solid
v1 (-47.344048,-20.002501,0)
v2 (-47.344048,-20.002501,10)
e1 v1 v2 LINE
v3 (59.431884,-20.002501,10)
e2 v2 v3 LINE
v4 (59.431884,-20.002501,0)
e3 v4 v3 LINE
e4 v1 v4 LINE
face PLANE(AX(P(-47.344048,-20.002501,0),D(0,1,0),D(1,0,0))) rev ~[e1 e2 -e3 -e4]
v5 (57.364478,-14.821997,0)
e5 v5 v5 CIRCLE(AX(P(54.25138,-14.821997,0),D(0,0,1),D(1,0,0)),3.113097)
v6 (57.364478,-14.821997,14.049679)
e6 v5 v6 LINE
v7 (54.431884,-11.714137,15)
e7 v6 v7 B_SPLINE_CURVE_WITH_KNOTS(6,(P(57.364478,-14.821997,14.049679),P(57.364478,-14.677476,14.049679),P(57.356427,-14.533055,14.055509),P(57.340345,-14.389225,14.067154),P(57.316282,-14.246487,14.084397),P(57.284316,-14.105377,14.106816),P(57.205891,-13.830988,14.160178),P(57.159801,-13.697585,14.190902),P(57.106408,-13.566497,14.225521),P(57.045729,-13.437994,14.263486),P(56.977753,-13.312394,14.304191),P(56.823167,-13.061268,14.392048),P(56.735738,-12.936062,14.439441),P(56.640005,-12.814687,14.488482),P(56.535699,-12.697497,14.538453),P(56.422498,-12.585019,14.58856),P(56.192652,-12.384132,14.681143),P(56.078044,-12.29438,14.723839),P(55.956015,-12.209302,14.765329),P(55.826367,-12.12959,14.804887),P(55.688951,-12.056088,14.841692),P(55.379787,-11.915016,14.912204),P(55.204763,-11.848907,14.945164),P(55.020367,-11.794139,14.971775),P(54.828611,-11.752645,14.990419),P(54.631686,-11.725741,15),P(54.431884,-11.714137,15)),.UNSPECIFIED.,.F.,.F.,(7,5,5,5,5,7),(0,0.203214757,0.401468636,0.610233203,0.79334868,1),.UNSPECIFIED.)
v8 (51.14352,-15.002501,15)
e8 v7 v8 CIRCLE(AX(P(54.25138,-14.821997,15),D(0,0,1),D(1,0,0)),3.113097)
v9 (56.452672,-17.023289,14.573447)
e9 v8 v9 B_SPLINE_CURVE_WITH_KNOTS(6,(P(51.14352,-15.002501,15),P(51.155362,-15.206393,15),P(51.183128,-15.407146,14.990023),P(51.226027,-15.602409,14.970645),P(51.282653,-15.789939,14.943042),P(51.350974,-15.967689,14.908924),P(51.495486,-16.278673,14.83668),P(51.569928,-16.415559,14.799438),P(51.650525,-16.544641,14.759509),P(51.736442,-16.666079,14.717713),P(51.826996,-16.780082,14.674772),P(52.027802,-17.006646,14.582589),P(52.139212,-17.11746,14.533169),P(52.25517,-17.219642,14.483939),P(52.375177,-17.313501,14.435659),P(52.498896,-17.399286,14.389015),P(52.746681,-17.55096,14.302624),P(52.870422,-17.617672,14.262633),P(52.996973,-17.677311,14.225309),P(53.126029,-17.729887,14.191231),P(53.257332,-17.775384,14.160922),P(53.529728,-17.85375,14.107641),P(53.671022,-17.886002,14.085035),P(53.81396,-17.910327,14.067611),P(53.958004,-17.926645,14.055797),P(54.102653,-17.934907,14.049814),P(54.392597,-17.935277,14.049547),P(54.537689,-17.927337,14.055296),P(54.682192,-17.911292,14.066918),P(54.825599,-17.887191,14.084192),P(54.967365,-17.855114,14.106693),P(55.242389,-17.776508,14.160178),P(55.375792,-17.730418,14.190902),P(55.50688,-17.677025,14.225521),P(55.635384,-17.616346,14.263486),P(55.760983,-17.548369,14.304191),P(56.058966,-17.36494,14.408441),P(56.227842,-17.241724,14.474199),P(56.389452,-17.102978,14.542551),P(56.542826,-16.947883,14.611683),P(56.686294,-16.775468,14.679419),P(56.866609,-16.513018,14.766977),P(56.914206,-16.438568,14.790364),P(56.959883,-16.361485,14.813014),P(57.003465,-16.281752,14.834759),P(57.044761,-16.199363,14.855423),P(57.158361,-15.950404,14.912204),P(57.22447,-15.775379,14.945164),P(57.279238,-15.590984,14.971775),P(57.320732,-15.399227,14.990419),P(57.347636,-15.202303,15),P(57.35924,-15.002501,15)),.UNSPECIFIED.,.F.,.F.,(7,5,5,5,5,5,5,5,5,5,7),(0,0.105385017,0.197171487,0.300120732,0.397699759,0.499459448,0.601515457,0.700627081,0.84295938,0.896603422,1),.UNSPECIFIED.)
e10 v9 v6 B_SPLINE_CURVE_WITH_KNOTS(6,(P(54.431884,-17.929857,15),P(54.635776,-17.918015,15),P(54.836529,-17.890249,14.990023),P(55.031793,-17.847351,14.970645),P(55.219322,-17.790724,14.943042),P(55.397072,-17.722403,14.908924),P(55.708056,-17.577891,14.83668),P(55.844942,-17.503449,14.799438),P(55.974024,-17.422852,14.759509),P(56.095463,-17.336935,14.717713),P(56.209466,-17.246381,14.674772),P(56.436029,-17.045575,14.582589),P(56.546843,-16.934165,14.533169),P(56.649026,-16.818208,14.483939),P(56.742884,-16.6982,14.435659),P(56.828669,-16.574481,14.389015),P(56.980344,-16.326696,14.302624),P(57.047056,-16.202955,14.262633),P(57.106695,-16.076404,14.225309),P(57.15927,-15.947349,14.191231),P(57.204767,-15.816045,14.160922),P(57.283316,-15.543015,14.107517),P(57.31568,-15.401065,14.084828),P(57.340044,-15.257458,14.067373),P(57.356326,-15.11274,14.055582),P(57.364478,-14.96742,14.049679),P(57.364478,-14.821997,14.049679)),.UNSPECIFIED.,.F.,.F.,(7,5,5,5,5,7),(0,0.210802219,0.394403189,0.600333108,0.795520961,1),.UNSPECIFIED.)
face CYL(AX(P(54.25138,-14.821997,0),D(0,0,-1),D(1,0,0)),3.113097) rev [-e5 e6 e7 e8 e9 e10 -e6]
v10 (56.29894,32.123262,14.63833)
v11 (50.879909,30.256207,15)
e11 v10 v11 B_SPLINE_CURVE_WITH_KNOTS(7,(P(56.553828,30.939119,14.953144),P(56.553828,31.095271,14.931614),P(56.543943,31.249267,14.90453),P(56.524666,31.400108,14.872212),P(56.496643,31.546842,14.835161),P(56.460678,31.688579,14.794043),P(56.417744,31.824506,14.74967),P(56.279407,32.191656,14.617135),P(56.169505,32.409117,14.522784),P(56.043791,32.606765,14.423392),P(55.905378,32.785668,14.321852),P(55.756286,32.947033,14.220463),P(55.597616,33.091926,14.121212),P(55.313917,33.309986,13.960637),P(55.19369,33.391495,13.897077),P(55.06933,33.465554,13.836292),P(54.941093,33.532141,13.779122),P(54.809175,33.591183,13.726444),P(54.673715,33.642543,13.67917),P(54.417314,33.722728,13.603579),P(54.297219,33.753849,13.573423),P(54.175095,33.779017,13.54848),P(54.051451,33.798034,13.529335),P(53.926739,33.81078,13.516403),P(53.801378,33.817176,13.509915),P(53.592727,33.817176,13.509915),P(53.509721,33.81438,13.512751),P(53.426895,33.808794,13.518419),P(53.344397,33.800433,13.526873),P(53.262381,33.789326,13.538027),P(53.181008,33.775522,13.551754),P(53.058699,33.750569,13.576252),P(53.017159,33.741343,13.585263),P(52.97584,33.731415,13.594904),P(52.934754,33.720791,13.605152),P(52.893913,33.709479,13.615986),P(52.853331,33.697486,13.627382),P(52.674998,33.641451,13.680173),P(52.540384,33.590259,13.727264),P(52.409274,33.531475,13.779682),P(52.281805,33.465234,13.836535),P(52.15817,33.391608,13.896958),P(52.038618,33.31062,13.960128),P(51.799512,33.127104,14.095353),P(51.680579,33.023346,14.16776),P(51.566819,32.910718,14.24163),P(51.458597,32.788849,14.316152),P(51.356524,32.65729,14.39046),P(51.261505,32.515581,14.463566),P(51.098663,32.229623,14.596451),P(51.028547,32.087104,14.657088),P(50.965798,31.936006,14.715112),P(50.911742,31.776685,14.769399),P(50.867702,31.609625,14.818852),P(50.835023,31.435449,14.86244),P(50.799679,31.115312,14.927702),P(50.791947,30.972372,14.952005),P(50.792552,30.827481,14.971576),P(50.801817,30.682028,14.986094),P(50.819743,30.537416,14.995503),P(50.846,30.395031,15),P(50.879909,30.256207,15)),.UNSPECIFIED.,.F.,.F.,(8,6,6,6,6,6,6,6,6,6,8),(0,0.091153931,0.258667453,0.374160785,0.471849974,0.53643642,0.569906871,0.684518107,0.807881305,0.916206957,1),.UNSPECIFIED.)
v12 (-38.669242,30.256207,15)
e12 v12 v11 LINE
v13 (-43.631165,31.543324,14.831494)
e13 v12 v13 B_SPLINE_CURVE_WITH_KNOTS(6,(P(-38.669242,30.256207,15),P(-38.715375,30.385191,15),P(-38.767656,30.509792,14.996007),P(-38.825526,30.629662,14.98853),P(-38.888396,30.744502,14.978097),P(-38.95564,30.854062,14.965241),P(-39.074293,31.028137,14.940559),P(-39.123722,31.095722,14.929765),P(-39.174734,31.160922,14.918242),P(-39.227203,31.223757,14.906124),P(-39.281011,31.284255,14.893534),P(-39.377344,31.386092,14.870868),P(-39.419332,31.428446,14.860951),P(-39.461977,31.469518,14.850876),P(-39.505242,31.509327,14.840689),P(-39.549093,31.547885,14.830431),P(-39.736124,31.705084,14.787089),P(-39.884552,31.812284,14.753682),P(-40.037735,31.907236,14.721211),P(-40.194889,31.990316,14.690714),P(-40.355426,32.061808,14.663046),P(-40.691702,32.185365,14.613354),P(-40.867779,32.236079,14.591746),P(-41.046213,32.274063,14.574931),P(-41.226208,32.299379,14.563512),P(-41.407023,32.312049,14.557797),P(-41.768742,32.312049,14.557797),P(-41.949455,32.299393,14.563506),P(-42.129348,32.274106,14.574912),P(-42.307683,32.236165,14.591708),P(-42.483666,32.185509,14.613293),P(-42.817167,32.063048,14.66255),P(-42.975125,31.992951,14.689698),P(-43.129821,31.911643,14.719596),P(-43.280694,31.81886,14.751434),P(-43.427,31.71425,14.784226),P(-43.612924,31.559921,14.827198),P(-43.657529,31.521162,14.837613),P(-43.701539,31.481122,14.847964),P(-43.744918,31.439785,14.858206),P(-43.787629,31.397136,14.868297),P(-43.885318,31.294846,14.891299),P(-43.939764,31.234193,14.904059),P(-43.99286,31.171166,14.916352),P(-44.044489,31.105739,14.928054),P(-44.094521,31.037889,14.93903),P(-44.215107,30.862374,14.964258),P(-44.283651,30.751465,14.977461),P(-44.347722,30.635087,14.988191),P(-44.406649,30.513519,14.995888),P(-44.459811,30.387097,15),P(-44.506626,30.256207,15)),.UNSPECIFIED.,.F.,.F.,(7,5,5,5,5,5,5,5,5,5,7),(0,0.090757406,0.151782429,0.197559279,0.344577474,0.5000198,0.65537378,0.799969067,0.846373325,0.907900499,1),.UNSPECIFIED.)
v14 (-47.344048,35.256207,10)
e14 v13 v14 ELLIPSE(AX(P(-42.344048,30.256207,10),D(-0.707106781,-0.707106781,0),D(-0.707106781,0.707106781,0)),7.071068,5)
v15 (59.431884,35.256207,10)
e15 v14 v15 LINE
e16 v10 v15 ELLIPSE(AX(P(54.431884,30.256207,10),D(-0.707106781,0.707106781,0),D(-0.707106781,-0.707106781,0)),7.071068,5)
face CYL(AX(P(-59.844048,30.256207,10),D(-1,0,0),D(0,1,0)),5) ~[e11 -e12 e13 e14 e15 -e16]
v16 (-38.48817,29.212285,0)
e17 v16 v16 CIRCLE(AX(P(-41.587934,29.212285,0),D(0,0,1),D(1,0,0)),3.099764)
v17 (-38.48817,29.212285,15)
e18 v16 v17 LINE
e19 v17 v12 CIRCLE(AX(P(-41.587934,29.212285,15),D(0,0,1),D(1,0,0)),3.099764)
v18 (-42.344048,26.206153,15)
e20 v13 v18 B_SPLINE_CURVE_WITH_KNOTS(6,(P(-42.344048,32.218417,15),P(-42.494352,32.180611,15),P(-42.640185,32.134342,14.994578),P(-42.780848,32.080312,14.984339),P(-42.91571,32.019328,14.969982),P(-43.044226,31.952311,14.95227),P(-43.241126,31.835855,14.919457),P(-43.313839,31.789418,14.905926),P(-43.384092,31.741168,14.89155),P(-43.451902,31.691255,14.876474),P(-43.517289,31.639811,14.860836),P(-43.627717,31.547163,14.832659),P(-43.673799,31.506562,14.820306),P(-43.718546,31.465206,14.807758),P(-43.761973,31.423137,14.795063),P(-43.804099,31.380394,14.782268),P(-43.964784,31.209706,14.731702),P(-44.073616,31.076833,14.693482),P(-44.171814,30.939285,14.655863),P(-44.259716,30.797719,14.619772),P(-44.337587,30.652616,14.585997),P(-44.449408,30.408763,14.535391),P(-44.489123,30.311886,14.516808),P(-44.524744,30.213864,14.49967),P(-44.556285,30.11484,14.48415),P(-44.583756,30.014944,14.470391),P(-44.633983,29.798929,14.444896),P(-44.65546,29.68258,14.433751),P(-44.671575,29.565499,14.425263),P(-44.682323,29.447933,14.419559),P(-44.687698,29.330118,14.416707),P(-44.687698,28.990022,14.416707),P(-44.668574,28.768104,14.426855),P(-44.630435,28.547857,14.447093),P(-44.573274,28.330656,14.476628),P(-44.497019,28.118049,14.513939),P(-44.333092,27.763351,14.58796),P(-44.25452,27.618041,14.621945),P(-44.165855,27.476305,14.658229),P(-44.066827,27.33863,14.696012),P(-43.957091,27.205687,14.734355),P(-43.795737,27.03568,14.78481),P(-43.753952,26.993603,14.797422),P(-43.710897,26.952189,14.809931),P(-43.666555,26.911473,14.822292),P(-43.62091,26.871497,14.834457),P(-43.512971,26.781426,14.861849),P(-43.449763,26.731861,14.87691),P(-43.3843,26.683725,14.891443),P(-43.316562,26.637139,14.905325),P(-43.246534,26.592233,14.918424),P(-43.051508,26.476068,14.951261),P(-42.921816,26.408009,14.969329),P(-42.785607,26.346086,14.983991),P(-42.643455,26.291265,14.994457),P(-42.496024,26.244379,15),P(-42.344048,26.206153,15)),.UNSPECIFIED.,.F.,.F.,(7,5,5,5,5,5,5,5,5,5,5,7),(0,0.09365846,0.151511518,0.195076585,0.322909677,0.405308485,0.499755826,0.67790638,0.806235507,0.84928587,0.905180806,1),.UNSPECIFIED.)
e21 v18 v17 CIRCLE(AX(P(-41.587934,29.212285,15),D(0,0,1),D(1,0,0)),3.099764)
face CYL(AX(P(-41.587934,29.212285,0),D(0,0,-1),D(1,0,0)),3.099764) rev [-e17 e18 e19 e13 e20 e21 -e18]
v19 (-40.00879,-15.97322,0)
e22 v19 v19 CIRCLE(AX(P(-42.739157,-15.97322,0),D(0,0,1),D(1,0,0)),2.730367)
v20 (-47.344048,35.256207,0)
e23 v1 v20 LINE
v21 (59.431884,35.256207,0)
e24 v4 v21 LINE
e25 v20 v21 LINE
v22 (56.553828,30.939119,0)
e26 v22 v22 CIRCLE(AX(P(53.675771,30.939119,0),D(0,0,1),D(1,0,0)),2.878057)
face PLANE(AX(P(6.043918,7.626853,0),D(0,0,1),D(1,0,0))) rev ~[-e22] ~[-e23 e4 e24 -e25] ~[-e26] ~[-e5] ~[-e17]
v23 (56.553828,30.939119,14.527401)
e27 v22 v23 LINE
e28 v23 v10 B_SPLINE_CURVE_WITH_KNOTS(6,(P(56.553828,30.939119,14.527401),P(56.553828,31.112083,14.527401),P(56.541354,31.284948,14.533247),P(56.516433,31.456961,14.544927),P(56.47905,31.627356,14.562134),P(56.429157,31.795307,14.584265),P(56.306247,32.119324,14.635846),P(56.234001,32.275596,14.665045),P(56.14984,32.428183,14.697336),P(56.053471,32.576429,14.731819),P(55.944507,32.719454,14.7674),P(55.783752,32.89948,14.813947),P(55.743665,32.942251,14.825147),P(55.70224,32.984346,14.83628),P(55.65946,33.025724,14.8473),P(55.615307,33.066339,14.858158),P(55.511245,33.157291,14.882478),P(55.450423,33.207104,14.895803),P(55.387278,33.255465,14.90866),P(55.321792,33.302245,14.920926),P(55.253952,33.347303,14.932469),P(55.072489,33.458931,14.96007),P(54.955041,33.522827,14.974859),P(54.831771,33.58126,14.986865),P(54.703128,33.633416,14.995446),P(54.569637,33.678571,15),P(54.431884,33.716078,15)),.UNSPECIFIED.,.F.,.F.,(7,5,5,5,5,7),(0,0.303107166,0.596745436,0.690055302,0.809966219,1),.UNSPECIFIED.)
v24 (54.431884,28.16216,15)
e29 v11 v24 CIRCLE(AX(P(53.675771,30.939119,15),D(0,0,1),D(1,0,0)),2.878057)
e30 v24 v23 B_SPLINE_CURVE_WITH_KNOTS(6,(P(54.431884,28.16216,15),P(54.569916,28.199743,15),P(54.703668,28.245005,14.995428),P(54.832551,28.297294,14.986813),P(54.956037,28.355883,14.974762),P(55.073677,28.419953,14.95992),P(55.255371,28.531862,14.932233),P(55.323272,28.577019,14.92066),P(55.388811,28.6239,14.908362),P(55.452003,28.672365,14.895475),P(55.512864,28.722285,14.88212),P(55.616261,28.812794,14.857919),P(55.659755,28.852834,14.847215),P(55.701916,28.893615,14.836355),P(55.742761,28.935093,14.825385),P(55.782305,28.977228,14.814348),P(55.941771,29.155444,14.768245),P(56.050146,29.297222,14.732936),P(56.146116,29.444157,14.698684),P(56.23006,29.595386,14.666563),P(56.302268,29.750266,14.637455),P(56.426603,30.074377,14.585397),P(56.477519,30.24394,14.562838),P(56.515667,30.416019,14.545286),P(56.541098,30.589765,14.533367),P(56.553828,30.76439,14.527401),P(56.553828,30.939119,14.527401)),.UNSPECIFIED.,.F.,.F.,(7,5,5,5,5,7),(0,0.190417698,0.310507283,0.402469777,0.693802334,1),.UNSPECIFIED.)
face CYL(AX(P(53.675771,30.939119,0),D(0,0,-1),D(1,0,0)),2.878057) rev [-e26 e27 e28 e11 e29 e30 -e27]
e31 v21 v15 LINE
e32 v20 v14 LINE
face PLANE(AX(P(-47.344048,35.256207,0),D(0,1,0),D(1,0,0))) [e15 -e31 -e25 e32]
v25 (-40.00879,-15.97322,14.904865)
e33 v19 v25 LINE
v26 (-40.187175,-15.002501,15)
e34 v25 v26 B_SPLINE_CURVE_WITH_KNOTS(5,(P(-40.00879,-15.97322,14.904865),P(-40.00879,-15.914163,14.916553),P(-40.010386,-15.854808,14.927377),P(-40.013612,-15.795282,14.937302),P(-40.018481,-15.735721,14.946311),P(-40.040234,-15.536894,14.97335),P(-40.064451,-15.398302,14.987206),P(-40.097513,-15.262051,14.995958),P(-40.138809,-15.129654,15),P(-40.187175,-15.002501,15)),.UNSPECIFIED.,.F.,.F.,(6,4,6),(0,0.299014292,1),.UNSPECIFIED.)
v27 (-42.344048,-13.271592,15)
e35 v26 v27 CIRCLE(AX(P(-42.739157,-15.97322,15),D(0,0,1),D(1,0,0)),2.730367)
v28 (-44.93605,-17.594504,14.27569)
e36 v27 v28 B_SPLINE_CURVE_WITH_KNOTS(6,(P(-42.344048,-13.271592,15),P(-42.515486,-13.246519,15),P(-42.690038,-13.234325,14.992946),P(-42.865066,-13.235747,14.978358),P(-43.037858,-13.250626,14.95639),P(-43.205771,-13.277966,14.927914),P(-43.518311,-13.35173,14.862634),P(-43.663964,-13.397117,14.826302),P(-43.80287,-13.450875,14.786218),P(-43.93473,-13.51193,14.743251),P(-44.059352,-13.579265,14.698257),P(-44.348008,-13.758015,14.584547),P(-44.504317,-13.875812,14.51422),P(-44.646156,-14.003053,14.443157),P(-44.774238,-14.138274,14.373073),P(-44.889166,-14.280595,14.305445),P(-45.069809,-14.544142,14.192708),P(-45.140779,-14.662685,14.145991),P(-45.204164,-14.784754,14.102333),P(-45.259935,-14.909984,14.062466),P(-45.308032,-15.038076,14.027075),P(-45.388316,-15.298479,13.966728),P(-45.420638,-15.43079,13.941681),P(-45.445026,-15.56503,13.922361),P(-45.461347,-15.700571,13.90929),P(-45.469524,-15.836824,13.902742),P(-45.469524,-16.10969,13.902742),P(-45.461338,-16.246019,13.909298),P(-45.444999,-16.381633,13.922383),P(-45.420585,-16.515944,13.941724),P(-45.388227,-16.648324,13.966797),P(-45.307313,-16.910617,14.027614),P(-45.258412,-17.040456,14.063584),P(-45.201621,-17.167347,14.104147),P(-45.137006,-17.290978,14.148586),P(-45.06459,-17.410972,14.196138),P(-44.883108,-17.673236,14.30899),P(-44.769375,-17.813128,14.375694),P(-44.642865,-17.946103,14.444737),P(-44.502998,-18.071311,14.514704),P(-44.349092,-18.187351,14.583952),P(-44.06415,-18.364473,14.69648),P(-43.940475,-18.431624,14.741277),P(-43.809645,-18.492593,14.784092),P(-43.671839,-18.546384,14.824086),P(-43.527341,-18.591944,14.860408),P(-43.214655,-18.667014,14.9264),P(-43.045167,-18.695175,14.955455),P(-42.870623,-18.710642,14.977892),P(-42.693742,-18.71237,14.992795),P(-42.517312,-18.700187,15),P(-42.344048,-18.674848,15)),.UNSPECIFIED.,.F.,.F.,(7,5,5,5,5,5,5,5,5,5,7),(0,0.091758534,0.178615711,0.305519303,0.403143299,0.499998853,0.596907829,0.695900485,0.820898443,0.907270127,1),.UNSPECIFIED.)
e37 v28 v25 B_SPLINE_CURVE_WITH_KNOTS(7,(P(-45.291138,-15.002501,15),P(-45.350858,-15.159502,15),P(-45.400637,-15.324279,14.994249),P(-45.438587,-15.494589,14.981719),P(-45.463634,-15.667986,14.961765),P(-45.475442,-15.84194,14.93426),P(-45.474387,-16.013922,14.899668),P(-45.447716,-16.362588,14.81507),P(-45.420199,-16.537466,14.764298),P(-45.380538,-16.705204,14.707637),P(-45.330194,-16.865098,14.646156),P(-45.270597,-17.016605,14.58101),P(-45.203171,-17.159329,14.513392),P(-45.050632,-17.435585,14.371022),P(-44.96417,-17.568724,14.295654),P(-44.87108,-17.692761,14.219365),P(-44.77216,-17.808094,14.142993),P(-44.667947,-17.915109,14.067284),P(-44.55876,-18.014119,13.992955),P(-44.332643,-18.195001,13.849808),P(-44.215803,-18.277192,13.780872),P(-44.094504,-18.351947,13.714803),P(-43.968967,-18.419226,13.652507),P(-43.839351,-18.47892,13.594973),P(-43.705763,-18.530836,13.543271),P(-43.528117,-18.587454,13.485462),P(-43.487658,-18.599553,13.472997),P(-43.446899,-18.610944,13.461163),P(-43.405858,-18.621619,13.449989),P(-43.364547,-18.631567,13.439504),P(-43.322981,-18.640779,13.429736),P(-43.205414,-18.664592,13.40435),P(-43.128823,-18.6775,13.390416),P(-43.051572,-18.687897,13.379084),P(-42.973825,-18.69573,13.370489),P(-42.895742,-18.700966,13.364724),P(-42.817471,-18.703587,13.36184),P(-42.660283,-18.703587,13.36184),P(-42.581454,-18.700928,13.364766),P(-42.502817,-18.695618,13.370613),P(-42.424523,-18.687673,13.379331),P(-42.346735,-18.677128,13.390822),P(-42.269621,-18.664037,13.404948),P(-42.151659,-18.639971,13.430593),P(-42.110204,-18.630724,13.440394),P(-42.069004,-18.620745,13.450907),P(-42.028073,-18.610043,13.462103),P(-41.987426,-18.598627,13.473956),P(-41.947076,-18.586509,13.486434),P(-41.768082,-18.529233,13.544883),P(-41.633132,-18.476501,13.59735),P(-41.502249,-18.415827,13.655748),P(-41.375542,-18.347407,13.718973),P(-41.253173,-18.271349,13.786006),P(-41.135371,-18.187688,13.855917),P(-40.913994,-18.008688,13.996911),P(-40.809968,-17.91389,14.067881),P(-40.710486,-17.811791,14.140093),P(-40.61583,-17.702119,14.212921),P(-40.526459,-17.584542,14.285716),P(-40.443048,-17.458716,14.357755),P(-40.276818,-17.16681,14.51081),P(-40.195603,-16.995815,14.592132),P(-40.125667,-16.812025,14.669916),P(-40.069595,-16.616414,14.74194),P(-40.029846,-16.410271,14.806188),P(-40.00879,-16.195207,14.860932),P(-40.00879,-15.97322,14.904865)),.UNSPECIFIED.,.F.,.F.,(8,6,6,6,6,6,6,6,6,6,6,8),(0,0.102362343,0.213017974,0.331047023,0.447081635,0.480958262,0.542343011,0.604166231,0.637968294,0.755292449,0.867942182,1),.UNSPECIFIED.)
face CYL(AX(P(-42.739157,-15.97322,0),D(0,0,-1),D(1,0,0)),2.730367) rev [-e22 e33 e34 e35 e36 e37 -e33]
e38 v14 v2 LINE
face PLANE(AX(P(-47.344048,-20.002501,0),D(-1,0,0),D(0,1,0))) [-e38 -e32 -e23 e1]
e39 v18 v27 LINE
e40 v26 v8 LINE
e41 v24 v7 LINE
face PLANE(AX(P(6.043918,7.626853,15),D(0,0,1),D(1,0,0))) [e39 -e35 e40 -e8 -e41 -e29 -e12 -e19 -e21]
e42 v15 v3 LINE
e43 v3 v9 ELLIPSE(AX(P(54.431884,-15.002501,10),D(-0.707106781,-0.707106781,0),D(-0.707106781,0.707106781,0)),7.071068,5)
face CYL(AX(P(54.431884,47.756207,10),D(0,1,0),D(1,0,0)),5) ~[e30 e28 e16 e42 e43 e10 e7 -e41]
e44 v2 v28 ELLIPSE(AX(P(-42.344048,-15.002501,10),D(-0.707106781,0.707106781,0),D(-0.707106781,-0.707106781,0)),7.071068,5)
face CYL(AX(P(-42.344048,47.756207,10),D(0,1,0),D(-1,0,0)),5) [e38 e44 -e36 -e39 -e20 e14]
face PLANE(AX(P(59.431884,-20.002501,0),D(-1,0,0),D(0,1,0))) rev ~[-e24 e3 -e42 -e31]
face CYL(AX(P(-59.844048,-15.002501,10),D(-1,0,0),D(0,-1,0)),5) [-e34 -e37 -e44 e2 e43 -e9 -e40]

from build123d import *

# Parameters (mm, degrees)
F0_W        = 106.775932014
F0_H        = 55.2587080747
F0_R        = 2.7303671047
F0_R_2      = 3.1130972935
F0_R_3      = 3.09976381
F0_R_4      = 2.8780568391
F1_DEPTH    = 15
F2_T1_DEPTH = 131.775932014
F2_T3_DEPTH = 80.2587080747


# Not quite as in the source:
# - a fillet or chamfer that OpenCascade refuses, or shapes differently, is made with other operations: its cross-section is extruded or revolved along the edge and cut away or added


with BuildPart() as f1:
    # F0 (on Top) → F1 (new body)
    with BuildSketch(Plane.XY):
        with Locations((6.0439184308, 7.6268529519)):
            Rectangle(F0_W, F0_H)
        with Locations((-42.7391566336, -15.973219648)):
            Circle(F0_R, mode=Mode.SUBTRACT)
        with Locations((54.2513802648, -14.8219969124)):
            Circle(F0_R_2, mode=Mode.SUBTRACT)
        with Locations((-41.587933898, 29.2122848332)):
            Circle(F0_R_3, mode=Mode.SUBTRACT)
        with Locations((53.6757707596, 30.9391189367)):
            Circle(F0_R_4, mode=Mode.SUBTRACT)
    extrude(amount=F1_DEPTH)

    # F2: fillet of radius 5 on 4 edges, made by hand

    # F2_s2 → F2_t1 (cut)
    with BuildSketch(Plane.YZ.offset(-59.8440475762)):
        with BuildLine():
            ThreePointArc((-20.0025010854, 10), (-18.5380349913, 13.5355339059), (-15.0025010854, 15))
            Line((-15.0025010854, 15), (-20.0025010854, 15))
            Line((-20.0025010854, 15), (-20.0025010854, 10))
        make_face()
        with BuildLine():
            ThreePointArc((35.2562069893, 10), (33.7917408952, 13.5355339059), (30.2562069893, 15))
            Line((30.2562069893, 15), (35.2562069893, 15))
            Line((35.2562069893, 15), (35.2562069893, 10))
        make_face()
    extrude(amount=F2_T1_DEPTH, mode=Mode.SUBTRACT)

    # F2_s4 → F2_t3 (cut)
    with BuildSketch(Plane.XZ.offset(-47.7562069893)):
        with BuildLine():
            ThreePointArc((59.4318844378, 10), (57.9674183437, 13.5355339059), (54.4318844378, 15))
            Line((54.4318844378, 15), (59.4318844378, 15))
            Line((59.4318844378, 15), (59.4318844378, 10))
        make_face()
        with BuildLine():
            ThreePointArc((-47.3440475762, 10), (-45.8795814821, 13.5355339059), (-42.3440475762, 15))
            Line((-42.3440475762, 15), (-47.3440475762, 15))
            Line((-47.3440475762, 15), (-47.3440475762, 10))
        make_face()
    extrude(amount=F2_T3_DEPTH, mode=Mode.SUBTRACT)


solid = f1.part
